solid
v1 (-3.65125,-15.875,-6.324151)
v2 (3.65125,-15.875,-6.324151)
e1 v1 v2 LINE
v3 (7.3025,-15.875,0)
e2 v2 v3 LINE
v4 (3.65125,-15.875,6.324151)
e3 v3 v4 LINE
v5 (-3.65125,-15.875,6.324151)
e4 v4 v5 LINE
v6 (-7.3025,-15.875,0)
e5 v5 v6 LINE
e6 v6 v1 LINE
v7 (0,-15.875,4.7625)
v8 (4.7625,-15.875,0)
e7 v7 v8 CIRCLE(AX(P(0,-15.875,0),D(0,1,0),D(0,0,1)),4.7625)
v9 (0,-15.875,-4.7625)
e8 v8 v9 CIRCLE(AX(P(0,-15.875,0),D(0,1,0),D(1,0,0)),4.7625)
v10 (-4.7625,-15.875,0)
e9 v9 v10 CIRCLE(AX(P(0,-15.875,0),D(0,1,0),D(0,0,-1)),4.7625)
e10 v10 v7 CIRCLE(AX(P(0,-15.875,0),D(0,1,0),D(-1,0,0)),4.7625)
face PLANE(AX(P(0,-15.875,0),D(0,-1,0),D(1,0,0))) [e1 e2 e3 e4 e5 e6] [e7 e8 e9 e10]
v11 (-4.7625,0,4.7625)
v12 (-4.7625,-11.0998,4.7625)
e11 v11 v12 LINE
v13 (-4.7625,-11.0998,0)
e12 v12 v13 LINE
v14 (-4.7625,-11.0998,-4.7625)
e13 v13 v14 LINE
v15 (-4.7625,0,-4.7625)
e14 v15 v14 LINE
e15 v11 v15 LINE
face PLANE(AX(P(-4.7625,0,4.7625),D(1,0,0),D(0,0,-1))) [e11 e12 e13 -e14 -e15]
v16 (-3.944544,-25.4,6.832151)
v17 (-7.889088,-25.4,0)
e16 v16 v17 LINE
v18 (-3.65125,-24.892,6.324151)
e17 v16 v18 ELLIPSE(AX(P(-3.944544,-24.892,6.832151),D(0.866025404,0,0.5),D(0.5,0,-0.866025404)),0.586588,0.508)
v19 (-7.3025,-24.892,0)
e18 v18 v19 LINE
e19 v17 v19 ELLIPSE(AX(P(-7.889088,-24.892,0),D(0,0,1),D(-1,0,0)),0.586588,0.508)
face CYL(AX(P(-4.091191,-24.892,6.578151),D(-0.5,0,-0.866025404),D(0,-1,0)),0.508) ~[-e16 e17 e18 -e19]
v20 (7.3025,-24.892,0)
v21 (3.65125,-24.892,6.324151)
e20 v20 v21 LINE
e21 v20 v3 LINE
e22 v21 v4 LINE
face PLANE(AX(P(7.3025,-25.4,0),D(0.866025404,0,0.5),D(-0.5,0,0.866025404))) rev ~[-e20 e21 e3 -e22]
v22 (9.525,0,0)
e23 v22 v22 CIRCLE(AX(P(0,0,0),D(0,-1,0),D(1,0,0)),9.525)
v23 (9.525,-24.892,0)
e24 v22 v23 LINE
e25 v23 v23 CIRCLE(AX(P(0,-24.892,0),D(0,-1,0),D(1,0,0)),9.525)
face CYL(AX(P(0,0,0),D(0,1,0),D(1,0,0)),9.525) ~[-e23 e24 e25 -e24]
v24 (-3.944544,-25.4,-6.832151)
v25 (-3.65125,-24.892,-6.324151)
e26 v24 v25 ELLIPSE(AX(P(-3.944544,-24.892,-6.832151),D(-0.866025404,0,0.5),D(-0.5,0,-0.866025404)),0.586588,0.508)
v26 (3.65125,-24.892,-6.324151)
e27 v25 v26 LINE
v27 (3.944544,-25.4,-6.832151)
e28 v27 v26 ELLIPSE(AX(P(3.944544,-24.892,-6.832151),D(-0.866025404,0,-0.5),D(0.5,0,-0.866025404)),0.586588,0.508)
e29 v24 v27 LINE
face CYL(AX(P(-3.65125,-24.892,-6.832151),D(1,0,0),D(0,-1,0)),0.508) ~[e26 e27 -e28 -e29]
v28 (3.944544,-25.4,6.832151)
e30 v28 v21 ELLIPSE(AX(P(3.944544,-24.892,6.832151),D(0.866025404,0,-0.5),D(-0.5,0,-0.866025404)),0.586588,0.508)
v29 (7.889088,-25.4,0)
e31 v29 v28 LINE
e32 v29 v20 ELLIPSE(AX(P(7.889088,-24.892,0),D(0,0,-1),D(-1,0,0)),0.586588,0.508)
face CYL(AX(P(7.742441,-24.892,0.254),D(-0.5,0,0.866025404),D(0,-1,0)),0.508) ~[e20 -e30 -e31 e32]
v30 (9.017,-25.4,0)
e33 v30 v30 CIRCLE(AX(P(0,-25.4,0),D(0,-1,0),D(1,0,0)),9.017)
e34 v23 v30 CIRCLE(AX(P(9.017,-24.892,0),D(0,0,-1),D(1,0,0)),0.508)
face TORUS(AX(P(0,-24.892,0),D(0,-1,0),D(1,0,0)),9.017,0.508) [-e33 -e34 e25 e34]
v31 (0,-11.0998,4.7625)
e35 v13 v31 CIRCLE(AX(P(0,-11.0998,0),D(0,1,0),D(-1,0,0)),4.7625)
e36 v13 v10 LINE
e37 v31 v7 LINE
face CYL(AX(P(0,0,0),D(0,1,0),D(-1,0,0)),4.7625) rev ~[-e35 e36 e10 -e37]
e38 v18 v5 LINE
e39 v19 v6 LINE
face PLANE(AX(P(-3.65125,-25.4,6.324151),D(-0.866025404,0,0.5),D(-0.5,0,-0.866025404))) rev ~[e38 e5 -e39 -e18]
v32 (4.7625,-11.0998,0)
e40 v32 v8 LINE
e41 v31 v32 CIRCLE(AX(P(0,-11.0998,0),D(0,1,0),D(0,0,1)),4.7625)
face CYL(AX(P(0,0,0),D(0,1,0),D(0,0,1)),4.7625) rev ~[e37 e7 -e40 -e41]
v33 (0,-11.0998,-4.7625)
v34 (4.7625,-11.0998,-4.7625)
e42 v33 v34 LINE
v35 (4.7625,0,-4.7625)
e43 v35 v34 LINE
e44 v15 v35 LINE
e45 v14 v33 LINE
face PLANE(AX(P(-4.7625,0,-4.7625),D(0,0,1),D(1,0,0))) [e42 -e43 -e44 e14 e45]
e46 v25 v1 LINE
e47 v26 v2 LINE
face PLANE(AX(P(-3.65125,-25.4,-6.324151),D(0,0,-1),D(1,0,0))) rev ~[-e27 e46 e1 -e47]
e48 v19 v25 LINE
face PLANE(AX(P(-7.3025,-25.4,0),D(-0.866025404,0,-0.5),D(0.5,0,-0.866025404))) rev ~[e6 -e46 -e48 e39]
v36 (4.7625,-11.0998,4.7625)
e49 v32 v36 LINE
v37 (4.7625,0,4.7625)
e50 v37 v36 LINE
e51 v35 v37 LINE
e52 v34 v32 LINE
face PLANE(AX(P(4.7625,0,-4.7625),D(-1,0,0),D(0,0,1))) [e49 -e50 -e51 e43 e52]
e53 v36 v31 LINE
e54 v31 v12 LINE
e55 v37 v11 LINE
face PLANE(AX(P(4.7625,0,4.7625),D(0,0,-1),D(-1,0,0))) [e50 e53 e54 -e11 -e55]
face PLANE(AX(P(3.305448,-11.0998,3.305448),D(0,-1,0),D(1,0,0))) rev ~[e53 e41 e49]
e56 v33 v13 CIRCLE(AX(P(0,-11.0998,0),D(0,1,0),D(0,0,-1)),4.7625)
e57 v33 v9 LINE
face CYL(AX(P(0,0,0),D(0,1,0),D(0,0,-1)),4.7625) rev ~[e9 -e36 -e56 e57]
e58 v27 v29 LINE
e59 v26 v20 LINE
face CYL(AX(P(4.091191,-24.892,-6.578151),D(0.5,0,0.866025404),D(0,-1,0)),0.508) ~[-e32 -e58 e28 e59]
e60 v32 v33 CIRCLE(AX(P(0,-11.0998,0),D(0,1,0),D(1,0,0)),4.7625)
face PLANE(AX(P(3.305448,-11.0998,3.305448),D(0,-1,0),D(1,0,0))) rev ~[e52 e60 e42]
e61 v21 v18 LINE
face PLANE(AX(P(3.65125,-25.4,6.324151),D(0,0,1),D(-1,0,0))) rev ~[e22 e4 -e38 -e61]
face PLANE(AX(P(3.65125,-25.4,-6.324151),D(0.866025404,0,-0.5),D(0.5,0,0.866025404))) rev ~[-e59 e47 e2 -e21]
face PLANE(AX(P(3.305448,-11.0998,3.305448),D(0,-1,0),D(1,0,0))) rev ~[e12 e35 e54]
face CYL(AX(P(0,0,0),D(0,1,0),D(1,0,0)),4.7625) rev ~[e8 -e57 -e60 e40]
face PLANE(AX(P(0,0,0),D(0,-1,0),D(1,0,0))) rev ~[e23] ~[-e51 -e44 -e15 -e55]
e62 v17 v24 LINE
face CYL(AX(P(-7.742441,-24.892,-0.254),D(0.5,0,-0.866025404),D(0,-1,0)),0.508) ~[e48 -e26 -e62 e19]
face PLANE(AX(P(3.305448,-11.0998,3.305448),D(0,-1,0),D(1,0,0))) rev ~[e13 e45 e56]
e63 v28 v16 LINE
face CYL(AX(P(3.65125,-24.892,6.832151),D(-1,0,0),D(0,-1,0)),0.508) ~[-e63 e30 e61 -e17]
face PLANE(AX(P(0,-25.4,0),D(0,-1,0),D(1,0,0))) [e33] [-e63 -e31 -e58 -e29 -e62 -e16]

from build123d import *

# Parameters (mm, degrees)
F0_R      = 9.525
F1_DEPTH  = 25.4
F3_DEPTH  = 50
F5_DEPTH  = 25.401
F6_DEPTH  = 9.398
F7_DEPTH  = 12.7
F8_DEPTH  = 11.0998
F10_DEPTH = 9.525
F11_R     = 0.508


# Not quite as in the source:
# - an extrude ends at something that could not be found from the text; its depth is read off the source's solid


with BuildPart() as f1:
    # F0 (on Front) → F1 (new body)
    with BuildSketch(Plane.XZ):
        Circle(F0_R)
    extrude(amount=F1_DEPTH)

    # F2 (on Front) → F3 (cut, through all)
    with BuildSketch(Plane.XZ):
        with BuildLine():
            ThreePointArc((4.7625, 0), (3.3675960454, 3.3675960454), (0, 4.7625))
            ThreePointArc((0, 4.7625), (-3.3675960454, 3.3675960454), (-4.7625, 0))
            ThreePointArc((-4.7625, 0), (-3.3675960454, -3.3675960454), (0, -4.7625))
            ThreePointArc((0, -4.7625), (3.3675960454, -3.3675960454), (4.7625, 0))
        make_face()
    extrude(amount=-F3_DEPTH, mode=Mode.SUBTRACT)

    # F4 (on face) → F5 (cut, through all)
    with BuildSketch(Plane(origin=(0, 0, 0), x_dir=(-1, 0, 0), z_dir=(0, 1, 0))):
        with BuildLine():
            ThreePointArc((-4.7625, 0), (-3.3675960454, -3.3675960454), (0, -4.7625))
            ThreePointArc((0, -4.7625), (3.3675960454, -3.3675960454), (4.7625, 0))
            ThreePointArc((4.7625, 0), (3.3675960454, 3.3675960454), (0, 4.7625))
            ThreePointArc((0, 4.7625), (-3.3675960454, 3.3675960454), (-4.7625, 0))
        make_face()
    extrude(amount=-F5_DEPTH, mode=Mode.SUBTRACT)

    # F2 (on Front) → F6 (cut)
    with BuildSketch(Plane.XZ):
        with BuildLine():
            Line((4.7625, 0), (4.7625, 4.7625))
            Line((4.7625, 4.7625), (0, 4.7625))
            ThreePointArc((0, 4.7625), (3.3675960454, 3.3675960454), (4.7625, 0))
        make_face()
        with BuildLine():
            ThreePointArc((-4.7625, 0), (-3.3675960454, 3.3675960454), (0, 4.7625))
            Line((0, 4.7625), (-4.7625, 4.7625))
            Line((-4.7625, 4.7625), (-4.7625, 0))
        make_face()
        with BuildLine():
            ThreePointArc((4.7625, 0), (3.3675960454, 3.3675960454), (0, 4.7625))
            ThreePointArc((0, 4.7625), (-3.3675960454, 3.3675960454), (-4.7625, 0))
            ThreePointArc((-4.7625, 0), (-3.3675960454, -3.3675960454), (0, -4.7625))
            ThreePointArc((0, -4.7625), (3.3675960454, -3.3675960454), (4.7625, 0))
        make_face()
        with BuildLine():
            Line((4.7625, -4.7625), (4.7625, 0))
            ThreePointArc((4.7625, 0), (3.3675960454, -3.3675960454), (0, -4.7625))
            Line((0, -4.7625), (4.7625, -4.7625))
        make_face()
        with BuildLine():
            ThreePointArc((0, -4.7625), (-3.3675960454, -3.3675960454), (-4.7625, 0))
            Line((-4.7625, 0), (-4.7625, -4.7625))
            Line((-4.7625, -4.7625), (0, -4.7625))
        make_face()
    extrude(amount=-F6_DEPTH, mode=Mode.SUBTRACT)

    # F2 (on Front) → F7 (cut)
    with BuildSketch(Plane.XZ):
        with BuildLine():
            Line((4.7625, 0), (4.7625, 4.7625))
            Line((4.7625, 4.7625), (0, 4.7625))
            ThreePointArc((0, 4.7625), (3.3675960454, 3.3675960454), (4.7625, 0))
        make_face()
        with BuildLine():
            ThreePointArc((-4.7625, 0), (-3.3675960454, 3.3675960454), (0, 4.7625))
            Line((0, 4.7625), (-4.7625, 4.7625))
            Line((-4.7625, 4.7625), (-4.7625, 0))
        make_face()
        with BuildLine():
            ThreePointArc((4.7625, 0), (3.3675960454, 3.3675960454), (0, 4.7625))
            ThreePointArc((0, 4.7625), (-3.3675960454, 3.3675960454), (-4.7625, 0))
            ThreePointArc((-4.7625, 0), (-3.3675960454, -3.3675960454), (0, -4.7625))
            ThreePointArc((0, -4.7625), (3.3675960454, -3.3675960454), (4.7625, 0))
        make_face()
        with BuildLine():
            Line((4.7625, -4.7625), (4.7625, 0))
            ThreePointArc((4.7625, 0), (3.3675960454, -3.3675960454), (0, -4.7625))
            Line((0, -4.7625), (4.7625, -4.7625))
        make_face()
        with BuildLine():
            ThreePointArc((0, -4.7625), (-3.3675960454, -3.3675960454), (-4.7625, 0))
            Line((-4.7625, 0), (-4.7625, -4.7625))
            Line((-4.7625, -4.7625), (0, -4.7625))
        make_face()
    extrude(amount=-F7_DEPTH, mode=Mode.SUBTRACT)

    # F2 (on Front) → F8 (cut)
    with BuildSketch(Plane.XZ):
        with BuildLine():
            Line((4.7625, 0), (4.7625, 4.7625))
            Line((4.7625, 4.7625), (0, 4.7625))
            ThreePointArc((0, 4.7625), (3.3675960454, 3.3675960454), (4.7625, 0))
        make_face()
        with BuildLine():
            ThreePointArc((-4.7625, 0), (-3.3675960454, 3.3675960454), (0, 4.7625))
            Line((0, 4.7625), (-4.7625, 4.7625))
            Line((-4.7625, 4.7625), (-4.7625, 0))
        make_face()
        with BuildLine():
            ThreePointArc((4.7625, 0), (3.3675960454, 3.3675960454), (0, 4.7625))
            ThreePointArc((0, 4.7625), (-3.3675960454, 3.3675960454), (-4.7625, 0))
            ThreePointArc((-4.7625, 0), (-3.3675960454, -3.3675960454), (0, -4.7625))
            ThreePointArc((0, -4.7625), (3.3675960454, -3.3675960454), (4.7625, 0))
        make_face()
        with BuildLine():
            Line((4.7625, -4.7625), (4.7625, 0))
            ThreePointArc((4.7625, 0), (3.3675960454, -3.3675960454), (0, -4.7625))
            Line((0, -4.7625), (4.7625, -4.7625))
        make_face()
        with BuildLine():
            ThreePointArc((0, -4.7625), (-3.3675960454, -3.3675960454), (-4.7625, 0))
            Line((-4.7625, 0), (-4.7625, -4.7625))
            Line((-4.7625, -4.7625), (0, -4.7625))
        make_face()
    extrude(amount=F8_DEPTH, mode=Mode.SUBTRACT)

    # F9 (on face) → F10 (cut)
    with BuildSketch(Plane.XZ.offset(25.4)):
        Polygon((3.65125, 6.3241505111), (-3.65125, 6.3241505111), (-7.3025, 0), (-3.65125, -6.3241505111), (3.65125, -6.3241505111), (7.3025, 0), align=None)
    extrude(amount=-F10_DEPTH, mode=Mode.SUBTRACT)

    # F11
    f11_edges = [f1.edges().sort_by_distance(p)[0] for p in [
        (-9.525, -25.4, 0),
        (-5.476875, -25.4, 3.162075),
        (0, -25.4, 6.324151),
        (5.476875, -25.4, 3.162075),
        (-5.476875, -25.4, -3.162075),
        (0, -25.4, -6.324151),
        (5.476875, -25.4, -3.162075),
    ]]
    fillet(f11_edges, radius=F11_R)


solid = f1.part
